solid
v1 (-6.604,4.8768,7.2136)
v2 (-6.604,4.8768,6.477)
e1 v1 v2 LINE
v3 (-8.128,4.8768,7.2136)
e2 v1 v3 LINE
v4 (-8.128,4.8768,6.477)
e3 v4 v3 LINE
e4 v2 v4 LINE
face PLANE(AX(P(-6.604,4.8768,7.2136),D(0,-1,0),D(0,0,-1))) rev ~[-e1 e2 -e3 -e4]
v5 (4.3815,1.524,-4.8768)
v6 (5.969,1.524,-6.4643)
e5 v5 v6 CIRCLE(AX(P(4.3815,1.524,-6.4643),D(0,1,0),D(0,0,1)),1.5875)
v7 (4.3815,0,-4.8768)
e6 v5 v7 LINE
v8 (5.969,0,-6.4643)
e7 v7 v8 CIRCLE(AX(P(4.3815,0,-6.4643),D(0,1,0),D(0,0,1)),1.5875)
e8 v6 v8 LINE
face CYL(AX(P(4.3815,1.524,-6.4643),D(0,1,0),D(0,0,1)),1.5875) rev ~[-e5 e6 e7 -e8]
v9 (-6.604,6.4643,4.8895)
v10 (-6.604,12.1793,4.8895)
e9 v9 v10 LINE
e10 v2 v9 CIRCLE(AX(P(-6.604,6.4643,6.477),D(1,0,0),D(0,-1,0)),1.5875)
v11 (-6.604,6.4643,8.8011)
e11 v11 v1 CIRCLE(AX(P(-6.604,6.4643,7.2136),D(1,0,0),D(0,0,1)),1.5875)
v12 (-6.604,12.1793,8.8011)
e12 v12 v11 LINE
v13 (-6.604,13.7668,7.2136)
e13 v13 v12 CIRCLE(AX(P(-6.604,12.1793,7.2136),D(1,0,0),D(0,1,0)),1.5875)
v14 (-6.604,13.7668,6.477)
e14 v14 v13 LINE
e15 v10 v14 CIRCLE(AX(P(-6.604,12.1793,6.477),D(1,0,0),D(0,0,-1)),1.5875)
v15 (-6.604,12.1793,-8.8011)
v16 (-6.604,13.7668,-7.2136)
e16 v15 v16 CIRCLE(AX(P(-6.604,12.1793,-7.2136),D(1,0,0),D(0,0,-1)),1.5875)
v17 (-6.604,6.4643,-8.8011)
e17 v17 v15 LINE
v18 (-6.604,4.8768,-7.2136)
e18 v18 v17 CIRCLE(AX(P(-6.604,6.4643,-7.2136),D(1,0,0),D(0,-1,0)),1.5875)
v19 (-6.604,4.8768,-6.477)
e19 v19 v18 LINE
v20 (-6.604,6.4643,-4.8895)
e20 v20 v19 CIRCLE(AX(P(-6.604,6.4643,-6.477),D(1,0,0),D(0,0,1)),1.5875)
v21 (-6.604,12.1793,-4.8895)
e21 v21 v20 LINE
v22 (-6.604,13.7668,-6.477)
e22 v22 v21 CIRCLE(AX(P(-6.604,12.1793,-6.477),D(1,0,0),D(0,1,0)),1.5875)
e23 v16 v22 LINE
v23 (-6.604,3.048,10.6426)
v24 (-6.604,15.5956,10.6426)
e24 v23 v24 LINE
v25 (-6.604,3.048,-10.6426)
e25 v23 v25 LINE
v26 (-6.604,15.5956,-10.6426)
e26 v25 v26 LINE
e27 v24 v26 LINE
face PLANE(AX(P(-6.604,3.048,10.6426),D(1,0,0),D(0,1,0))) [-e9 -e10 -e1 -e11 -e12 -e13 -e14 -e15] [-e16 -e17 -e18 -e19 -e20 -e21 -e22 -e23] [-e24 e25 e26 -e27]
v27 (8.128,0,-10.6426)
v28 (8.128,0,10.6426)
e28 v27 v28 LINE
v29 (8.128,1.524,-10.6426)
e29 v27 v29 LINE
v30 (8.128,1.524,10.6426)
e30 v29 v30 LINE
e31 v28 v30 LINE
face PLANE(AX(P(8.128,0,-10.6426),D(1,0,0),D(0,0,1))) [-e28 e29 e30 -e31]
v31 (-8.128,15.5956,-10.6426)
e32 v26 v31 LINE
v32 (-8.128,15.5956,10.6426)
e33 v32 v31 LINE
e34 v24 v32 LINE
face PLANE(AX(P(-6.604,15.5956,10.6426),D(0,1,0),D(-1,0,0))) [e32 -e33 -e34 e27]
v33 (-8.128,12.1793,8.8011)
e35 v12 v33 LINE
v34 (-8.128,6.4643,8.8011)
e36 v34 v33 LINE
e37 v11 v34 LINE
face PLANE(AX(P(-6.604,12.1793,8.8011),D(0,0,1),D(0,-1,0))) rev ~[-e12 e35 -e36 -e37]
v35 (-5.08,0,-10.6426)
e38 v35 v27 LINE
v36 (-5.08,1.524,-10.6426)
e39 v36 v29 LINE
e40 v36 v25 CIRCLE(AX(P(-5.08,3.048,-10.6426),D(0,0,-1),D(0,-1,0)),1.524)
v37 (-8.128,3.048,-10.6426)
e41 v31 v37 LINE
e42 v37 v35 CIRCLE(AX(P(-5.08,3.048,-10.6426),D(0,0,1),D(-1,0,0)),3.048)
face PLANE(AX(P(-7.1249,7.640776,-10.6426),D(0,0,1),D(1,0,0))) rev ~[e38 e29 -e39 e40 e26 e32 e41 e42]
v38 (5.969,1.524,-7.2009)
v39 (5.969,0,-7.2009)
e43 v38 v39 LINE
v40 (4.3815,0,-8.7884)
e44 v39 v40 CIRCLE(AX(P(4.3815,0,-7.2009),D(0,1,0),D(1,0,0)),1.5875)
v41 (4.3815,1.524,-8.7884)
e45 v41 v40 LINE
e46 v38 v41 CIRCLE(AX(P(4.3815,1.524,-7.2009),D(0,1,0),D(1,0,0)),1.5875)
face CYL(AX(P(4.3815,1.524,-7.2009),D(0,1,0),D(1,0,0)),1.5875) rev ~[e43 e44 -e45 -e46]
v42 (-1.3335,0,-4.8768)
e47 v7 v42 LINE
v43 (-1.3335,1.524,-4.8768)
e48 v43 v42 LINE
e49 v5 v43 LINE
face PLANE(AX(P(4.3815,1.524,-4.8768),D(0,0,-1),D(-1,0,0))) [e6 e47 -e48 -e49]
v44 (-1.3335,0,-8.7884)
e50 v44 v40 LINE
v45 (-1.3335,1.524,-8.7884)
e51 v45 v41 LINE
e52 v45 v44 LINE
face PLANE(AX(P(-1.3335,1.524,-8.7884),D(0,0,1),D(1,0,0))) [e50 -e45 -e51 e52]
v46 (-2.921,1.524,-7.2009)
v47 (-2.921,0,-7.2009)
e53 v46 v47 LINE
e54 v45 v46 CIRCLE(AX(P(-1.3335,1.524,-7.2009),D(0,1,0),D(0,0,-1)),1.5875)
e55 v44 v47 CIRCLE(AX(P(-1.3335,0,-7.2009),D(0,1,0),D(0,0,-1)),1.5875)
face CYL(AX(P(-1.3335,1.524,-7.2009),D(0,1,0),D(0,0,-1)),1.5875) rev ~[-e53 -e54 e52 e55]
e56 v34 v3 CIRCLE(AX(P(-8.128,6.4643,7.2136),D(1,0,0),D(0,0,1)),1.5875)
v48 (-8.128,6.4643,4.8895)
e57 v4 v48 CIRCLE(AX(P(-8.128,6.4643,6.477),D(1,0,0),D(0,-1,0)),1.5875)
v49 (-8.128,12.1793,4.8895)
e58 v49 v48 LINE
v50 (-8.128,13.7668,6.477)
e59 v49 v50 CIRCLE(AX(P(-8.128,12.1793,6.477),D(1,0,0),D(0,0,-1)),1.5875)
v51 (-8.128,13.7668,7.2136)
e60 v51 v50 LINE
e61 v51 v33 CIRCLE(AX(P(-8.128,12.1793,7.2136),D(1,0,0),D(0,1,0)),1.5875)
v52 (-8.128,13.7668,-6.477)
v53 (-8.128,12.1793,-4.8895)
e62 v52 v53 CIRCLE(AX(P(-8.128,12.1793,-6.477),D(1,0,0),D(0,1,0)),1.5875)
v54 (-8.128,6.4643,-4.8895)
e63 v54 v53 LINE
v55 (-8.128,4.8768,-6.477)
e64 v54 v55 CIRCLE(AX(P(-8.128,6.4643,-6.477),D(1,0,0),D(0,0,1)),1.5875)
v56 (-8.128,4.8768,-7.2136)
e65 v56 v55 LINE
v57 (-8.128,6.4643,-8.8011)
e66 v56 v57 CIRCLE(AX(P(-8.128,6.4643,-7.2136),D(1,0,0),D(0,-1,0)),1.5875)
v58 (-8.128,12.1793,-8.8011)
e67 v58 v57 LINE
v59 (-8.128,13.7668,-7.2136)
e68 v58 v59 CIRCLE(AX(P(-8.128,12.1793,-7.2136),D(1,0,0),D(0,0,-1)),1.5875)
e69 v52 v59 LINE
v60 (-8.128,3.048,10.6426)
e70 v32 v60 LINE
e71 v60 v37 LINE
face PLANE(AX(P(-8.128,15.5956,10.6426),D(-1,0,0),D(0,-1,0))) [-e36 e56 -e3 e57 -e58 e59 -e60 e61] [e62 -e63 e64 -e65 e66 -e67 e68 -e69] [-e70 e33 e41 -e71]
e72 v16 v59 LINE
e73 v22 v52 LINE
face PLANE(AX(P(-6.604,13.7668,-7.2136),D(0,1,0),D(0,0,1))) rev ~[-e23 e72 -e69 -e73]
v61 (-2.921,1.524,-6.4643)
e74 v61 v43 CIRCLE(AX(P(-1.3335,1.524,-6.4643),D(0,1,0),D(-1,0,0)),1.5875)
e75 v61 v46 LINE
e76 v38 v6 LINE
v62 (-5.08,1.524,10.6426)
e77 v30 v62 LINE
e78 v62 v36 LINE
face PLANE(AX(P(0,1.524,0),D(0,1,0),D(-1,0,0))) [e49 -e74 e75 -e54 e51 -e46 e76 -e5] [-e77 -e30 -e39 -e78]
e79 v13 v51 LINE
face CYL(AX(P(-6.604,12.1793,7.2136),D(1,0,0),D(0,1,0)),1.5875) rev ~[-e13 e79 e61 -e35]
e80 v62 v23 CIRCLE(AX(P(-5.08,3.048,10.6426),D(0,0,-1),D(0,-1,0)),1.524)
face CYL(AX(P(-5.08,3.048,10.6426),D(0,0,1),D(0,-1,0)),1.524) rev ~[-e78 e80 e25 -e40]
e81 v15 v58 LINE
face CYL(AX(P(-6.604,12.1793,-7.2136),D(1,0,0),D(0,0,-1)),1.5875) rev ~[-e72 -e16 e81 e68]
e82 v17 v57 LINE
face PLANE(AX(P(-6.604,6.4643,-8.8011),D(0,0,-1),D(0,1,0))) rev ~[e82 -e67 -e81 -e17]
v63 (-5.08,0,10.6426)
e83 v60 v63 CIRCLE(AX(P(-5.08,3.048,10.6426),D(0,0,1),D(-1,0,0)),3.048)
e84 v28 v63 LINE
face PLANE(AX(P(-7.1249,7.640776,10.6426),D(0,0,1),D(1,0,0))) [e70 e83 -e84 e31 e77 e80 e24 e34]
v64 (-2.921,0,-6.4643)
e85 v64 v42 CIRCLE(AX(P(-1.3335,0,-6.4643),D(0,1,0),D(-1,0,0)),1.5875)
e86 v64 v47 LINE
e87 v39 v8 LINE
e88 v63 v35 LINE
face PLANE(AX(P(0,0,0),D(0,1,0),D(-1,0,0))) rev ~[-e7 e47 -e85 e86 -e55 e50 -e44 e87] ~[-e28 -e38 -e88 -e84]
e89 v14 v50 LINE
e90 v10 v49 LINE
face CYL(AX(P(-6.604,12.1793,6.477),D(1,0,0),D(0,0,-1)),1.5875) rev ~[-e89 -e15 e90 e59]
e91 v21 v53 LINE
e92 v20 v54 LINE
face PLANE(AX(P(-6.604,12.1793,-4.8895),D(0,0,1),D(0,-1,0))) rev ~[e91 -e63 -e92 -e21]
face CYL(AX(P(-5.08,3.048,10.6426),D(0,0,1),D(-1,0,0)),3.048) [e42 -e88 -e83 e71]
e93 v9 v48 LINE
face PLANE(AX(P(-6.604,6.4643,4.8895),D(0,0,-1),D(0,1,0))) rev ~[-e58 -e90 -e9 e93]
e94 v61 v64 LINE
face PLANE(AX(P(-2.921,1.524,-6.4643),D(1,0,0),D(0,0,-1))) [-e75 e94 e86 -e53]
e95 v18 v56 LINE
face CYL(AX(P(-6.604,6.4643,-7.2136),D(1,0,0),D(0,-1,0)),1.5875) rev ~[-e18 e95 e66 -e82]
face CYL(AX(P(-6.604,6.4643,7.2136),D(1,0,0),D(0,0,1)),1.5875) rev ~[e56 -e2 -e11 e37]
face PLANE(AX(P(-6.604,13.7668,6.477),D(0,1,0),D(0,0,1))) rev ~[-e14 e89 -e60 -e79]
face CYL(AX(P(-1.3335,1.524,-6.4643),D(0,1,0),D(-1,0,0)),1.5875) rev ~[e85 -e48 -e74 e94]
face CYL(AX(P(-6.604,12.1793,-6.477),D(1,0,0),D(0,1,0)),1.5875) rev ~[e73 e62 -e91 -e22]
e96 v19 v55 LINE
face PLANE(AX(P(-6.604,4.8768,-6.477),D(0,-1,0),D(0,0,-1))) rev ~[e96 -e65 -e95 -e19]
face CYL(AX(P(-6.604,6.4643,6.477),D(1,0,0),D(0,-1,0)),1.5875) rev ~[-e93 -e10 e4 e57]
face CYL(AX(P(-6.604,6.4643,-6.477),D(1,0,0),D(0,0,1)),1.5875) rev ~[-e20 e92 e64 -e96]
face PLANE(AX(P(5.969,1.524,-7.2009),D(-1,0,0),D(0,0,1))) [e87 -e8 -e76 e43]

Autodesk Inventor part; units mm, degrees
ref_plane "YZ Plane" through (0, 0, 0) normal (1, 0, 0) x (0, 1, 0)
ref_plane "XZ Plane" through (0, 0, 0) normal (0, 1, 0) x (-1, 0, 0)
ref_plane "XY Plane" through (0, 0, 0) normal (0, 0, 1) x (1, 0, 0)
sketch "Sketch1" plane through (0, 0, 0) normal (0, 1, 0) x (-1, 0, 0)
  line L0 (-8.128, 10.6426) -> (8.128, 10.6426)
  line L1 (8.128, 10.6426) -> (8.128, -10.6426)
  line L2 (8.128, -10.6426) -> (-8.128, -10.6426)
  line L3 (-8.128, -10.6426) -> (-8.128, 10.6426)
  line L4 (-8.128, 10.6426) -> (8.128, -10.6426) construction
  line L5 (8.128, 10.6426) -> (-8.128, -10.6426) construction
  point P0 (0, 0)
  dimension "d0" = 21.2852
  dimension "d1" = 16.256
extrude "Plate1" add sketch "Sketch1" along normal blind 1.524
sketch "Sketch2" plane through (-6.604, 0, 10.6426) normal (-1, 0, 0) x (0, -1, 0)
  line L0 (0, -21.2852) -> (0, 0)
  line L1 (0, 0) -> (-15.5956, 0)
  line L2 (-15.5956, 0) -> (-15.5956, -21.2852)
  line L3 (-15.5956, -21.2852) -> (0, -21.2852)
edge flange "Flange1" height 15.5956 angle 90 thickness 1.524 bend radius 1.524 thickness toward (-1, 0, 0) relief tear relief width 1.524 relief depth 0.762 edges at (-8.128, 1.524, 0) wall of the first edge with corners at (-6.604, 0, -10.6426) (-6.604, 0, 10.6426) (-6.604, 15.5956, 10.6426) (-6.604, 15.5956, -10.6426)
bend "Bend1"
corner "Corner1"
sketch "Sketch3" plane through (-6.604, 15.5956, 10.6426) normal (1, 0, 0) x (0, 0, -1)
  line L0 (0, 0) -> (0, -12.5476) construction
  line L1 (21.2852, -12.5476) -> (21.2852, 0) construction
  circle A0 centre (3.7973, -6.2738) radius 1.5875 construction
  circle A1 centre (17.4879, -6.2738) radius 1.5875 construction
  line L2 (3.7973, -6.2738) -> (17.4879, -6.2738) construction
  line L3 (21.2852, 0) -> (0, 0) construction
  line L4 (10.6426, 0) -> (10.6426, -12.5476) construction
  line L5 (0, -12.5476) -> (21.2852, -12.5476) construction
  line L6 (17.1196, -10.7188) -> (17.8562, -10.7188)
  line L7 (19.4437, -9.1313) -> (19.4437, -3.4163)
  line L8 (17.8562, -1.8288) -> (17.1196, -1.8288)
  line L9 (15.5321, -3.4163) -> (15.5321, -9.1313)
  line L10 (15.5321, -10.7188) -> (19.4437, -1.8288) construction
  line L11 (19.4437, -10.7188) -> (15.5321, -1.8288) construction
  arc A2 (17.1196, -1.8288) -> (15.5321, -3.4163) centre (17.1196, -3.4163) ccw
  arc A3 (19.4437, -3.4163) -> (17.8562, -1.8288) centre (17.8562, -3.4163) ccw
  arc A4 (15.5321, -9.1313) -> (17.1196, -10.7188) centre (17.1196, -9.1313) ccw
  arc A5 (17.8562, -10.7188) -> (19.4437, -9.1313) centre (17.8562, -9.1313) ccw
  line L12 (3.429, -10.7188) -> (4.1656, -10.7188)
  line L13 (5.7531, -9.1313) -> (5.7531, -3.4163)
  line L14 (4.1656, -1.8288) -> (3.429, -1.8288)
  line L15 (1.8415, -3.4163) -> (1.8415, -9.1313)
  line L16 (1.8415, -10.7188) -> (5.7531, -1.8288) construction
  line L17 (5.7531, -10.7188) -> (1.8415, -1.8288) construction
  arc A6 (3.429, -1.8288) -> (1.8415, -3.4163) centre (3.429, -3.4163) ccw
  arc A7 (5.7531, -3.4163) -> (4.1656, -1.8288) centre (4.1656, -3.4163) ccw
  arc A8 (4.1656, -10.7188) -> (5.7531, -9.1313) centre (4.1656, -9.1313) ccw
  arc A9 (1.8415, -9.1313) -> (3.429, -10.7188) centre (3.429, -9.1313) ccw
  point P0 (10.6426, -15.5956)
  point P1 (10.6426, -6.2738)
  dimension "d13" = 13.6906
  dimension "d14" = 3.175
  dimension "d15" = 3.175
  dimension "d16" = 3.9116
  dimension "d17" = 8.89
  dimension "d18" = 1.5875
  dimension "d19" = 3.9116
  dimension "d20" = 8.89
  dimension "d21" = 1.5875
sketch "Sketch4" plane through (0, 1.524, 0) normal (0, 1, 0) x (1, 0, 0)
  line L0 (-5.08, 10.6426) -> (8.128, 10.6426) construction
  line L1 (4.3815, 4.8768) -> (-1.3335, 4.8768)
  line L2 (-2.921, 6.4643) -> (-2.921, 7.2009)
  line L3 (-1.3335, 8.7884) -> (4.3815, 8.7884)
  line L4 (5.969, 7.2009) -> (5.969, 6.4643)
  arc A0 (-2.921, 6.4643) -> (-1.3335, 4.8768) centre (-1.3335, 6.4643) ccw
  arc A1 (-1.3335, 8.7884) -> (-2.921, 7.2009) centre (-1.3335, 7.2009) ccw
  arc A2 (4.3815, 4.8768) -> (5.969, 6.4643) centre (4.3815, 6.4643) ccw
  arc A3 (5.969, 7.2009) -> (4.3815, 8.7884) centre (4.3815, 7.2009) ccw
  line L5 (8.128, 10.6426) -> (8.128, -10.6426) projected
  line L6 (1.524, 4.8768) -> (1.524, 8.7884) construction
  line L7 (4.3815, -8.7884) -> (-1.3335, -8.7884) construction
  line L8 (-2.921, -7.2009) -> (-2.921, -6.4643) construction
  line L9 (-1.3335, -4.8768) -> (4.3815, -4.8768) construction
  line L10 (5.969, -6.4643) -> (5.969, -7.2009) construction
  arc A4 (-2.921, -7.2009) -> (-1.3335, -8.7884) centre (-1.3335, -7.2009) ccw construction
  arc A5 (-1.3335, -4.8768) -> (-2.921, -6.4643) centre (-1.3335, -6.4643) ccw construction
  arc A6 (4.3815, -8.7884) -> (5.969, -7.2009) centre (4.3815, -7.2009) ccw construction
  arc A7 (5.969, -6.4643) -> (4.3815, -4.8768) centre (4.3815, -6.4643) ccw construction
  line L11 (1.524, -8.7884) -> (1.524, -4.8768) construction
  line L12 (8.128, -10.6426) -> (-5.08, -10.6426) construction
  point P0 (0, 0)
  point P1 (1.524, 6.8326)
  point P2 (1.524, -6.8326)
  dimension "d26" = 1.5875
  dimension "d32" = 3.9116
  dimension "d33" = 8.89
  dimension "d34" = 6.604
  dimension "d35" = 3.81
  dimension "d36" = 1.5875
  dimension "d37" = 3.9116
  dimension "d38" = 8.89
  dimension "d39" = 3.81
  dimension "d40" = 6.604
extrude "Extrusion1" cut sketch "Sketch3" against normal through all
extrude "Extrusion3" cut sketch "Sketch4" against normal through all
equation "\"d3\" = BendReliefWidth"
equation "\"d4\" = BendReliefDepth"
equation "\"d5\" = MinimumRemnant"
equation "\"d6\" = BendRadius"
equation "\"d9\" = BendRadius"
equation "\"d10\" = CornerReliefSize"
equation "\"d11\" = GapSize"
equation "\"d12\" = JacobiRadiusSize"
equation "\"BendRadius\" = Thickness"
equation "\"BendReliefWidth\" = Thickness"
equation "\"BendReliefDepth\" = 0.5 * Thickness"
equation "\"CornerReliefSize\" = 4 * Thickness"
equation "\"MinimumRemnant\" = 2 * Thickness"
equation "\"TransitionRadius\" = BendRadius"
equation "\"JacobiRadiusSize\" = BendRadius"
equation "\"GapSize\" = Thickness"
equation "\"d2\" = BendRadius"
equation "\"Thickness\" = 1.524"
properties part number "mezzanineBracketRight"
